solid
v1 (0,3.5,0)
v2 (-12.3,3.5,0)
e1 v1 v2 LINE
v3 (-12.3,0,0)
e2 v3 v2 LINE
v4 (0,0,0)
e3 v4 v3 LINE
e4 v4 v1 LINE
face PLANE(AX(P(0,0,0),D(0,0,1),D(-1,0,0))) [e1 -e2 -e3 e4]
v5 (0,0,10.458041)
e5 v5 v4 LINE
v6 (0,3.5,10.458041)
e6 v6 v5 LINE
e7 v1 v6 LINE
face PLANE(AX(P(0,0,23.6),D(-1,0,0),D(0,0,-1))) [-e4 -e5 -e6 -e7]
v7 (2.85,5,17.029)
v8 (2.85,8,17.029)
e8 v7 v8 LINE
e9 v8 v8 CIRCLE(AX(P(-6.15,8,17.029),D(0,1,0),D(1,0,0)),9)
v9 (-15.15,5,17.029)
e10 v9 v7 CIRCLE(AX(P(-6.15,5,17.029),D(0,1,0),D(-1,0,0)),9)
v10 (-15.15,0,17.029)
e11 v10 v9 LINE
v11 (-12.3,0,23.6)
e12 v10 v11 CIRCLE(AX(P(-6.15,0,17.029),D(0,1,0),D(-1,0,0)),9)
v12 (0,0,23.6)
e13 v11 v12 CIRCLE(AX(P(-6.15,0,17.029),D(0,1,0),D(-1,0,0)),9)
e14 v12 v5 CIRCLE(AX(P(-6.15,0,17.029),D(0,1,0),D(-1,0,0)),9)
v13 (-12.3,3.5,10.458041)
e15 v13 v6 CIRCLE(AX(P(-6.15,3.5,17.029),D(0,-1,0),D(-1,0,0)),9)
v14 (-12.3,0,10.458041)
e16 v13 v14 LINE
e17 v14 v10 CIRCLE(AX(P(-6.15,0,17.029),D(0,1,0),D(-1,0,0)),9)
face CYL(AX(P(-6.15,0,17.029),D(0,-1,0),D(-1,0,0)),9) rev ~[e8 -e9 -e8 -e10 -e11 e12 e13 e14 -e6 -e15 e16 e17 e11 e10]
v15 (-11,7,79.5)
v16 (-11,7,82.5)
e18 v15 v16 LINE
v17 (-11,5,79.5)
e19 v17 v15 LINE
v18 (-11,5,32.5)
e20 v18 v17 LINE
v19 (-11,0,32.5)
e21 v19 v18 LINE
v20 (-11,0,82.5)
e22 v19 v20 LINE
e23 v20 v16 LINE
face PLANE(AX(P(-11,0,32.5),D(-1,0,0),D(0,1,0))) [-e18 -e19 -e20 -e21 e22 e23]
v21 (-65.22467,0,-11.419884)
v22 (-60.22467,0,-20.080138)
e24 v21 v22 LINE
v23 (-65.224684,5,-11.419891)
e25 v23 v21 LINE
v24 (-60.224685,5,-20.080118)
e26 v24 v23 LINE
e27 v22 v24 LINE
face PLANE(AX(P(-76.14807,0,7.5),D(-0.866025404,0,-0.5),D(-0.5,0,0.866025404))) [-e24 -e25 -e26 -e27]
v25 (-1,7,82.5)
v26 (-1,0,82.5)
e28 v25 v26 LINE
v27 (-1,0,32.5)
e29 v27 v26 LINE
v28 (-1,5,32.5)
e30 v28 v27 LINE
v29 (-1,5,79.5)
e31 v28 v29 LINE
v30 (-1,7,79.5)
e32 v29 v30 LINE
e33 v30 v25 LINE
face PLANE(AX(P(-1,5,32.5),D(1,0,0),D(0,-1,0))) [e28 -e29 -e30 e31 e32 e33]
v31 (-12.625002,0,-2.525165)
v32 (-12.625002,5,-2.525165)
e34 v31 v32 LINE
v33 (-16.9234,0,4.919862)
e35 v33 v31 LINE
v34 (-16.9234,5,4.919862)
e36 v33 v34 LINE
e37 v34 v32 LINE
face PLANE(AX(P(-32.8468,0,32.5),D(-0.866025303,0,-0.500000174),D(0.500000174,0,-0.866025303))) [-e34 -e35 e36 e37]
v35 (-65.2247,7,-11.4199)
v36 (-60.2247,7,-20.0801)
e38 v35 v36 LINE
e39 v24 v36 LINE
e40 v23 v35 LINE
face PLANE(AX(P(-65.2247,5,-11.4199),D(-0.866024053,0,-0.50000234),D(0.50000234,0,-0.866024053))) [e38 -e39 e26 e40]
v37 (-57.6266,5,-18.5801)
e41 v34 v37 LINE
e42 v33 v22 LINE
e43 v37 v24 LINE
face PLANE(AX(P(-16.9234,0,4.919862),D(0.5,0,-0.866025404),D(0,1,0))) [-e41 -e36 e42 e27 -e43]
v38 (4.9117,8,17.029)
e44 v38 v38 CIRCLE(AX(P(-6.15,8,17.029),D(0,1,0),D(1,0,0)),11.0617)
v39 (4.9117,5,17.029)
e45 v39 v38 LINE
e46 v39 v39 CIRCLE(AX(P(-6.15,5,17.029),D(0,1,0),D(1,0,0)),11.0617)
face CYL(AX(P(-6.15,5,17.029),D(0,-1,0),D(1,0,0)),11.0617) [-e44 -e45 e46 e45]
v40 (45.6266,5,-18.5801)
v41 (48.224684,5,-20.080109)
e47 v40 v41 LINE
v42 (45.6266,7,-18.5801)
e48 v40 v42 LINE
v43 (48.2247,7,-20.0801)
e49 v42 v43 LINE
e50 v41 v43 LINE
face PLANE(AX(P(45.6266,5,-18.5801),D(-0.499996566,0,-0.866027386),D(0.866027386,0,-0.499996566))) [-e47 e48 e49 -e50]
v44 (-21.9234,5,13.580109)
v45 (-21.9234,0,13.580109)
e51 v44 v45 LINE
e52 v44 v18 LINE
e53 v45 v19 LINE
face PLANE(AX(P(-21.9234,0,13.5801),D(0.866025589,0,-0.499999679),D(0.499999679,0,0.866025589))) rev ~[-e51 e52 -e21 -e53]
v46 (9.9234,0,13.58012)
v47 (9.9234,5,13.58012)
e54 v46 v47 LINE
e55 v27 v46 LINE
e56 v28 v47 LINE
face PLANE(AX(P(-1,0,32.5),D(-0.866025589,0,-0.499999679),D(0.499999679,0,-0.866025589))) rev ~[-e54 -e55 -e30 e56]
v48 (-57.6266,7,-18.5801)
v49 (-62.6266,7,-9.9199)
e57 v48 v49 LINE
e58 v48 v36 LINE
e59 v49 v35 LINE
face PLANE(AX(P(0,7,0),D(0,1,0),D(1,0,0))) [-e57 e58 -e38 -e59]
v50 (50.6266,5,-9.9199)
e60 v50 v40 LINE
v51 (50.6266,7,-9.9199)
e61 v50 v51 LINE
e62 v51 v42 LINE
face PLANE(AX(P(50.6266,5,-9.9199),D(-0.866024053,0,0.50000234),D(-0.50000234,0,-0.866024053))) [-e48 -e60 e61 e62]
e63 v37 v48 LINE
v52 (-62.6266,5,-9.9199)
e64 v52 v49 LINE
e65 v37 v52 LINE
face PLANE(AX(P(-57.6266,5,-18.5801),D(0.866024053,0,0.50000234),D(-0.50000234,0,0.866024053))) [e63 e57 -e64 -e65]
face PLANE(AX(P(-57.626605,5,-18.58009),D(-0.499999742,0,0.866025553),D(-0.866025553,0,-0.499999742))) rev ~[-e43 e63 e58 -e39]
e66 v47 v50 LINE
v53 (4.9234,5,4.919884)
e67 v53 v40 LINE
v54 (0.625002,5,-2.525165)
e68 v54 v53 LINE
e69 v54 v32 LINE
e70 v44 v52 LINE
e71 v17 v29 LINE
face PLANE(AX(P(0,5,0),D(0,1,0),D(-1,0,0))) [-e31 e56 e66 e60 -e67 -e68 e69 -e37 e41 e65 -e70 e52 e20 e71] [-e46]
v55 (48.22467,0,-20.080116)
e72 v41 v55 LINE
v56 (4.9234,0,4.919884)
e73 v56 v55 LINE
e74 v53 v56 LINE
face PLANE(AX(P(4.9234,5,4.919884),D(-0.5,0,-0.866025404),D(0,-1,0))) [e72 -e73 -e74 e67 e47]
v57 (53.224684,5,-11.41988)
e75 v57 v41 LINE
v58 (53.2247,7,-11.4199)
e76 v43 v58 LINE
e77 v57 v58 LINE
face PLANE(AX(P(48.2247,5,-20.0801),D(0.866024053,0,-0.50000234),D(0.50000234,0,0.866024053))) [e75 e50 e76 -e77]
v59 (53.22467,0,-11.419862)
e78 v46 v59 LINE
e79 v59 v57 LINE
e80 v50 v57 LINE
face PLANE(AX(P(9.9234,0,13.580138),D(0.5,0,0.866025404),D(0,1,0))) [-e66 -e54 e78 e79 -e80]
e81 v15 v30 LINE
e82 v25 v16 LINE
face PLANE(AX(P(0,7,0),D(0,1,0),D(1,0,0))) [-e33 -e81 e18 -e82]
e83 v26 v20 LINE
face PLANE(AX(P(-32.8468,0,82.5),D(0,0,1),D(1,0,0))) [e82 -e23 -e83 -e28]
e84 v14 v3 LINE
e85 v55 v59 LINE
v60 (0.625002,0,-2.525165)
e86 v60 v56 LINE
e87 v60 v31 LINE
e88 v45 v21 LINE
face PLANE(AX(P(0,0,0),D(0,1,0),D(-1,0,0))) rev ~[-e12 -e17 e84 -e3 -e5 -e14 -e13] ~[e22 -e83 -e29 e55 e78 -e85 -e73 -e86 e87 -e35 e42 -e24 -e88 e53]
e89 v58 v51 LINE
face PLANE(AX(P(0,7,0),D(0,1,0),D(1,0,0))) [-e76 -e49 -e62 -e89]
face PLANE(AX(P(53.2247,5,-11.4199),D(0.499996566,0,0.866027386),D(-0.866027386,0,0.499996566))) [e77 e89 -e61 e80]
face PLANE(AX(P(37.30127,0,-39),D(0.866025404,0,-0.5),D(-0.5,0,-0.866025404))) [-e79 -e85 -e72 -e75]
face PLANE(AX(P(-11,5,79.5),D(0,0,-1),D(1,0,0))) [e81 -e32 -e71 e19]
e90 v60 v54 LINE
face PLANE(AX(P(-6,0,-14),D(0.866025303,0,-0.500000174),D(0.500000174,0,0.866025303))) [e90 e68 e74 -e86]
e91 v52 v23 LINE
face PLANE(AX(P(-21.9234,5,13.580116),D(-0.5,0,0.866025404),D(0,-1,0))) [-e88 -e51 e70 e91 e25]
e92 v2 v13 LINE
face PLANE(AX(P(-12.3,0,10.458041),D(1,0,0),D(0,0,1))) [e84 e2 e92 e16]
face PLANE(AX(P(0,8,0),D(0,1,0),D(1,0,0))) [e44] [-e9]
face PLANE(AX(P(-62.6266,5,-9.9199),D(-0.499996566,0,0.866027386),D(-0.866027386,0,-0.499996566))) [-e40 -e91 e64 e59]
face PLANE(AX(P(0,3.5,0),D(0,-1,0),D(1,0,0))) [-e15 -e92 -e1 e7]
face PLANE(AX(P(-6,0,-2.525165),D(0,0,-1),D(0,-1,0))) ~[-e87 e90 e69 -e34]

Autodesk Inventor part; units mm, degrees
ref_plane "YZ Plane" through (0, 0, 0) normal (1, 0, 0) x (0, 1, 0)
ref_plane "XZ Plane" through (0, 0, 0) normal (0, 1, 0) x (-1, 0, 0)
ref_plane "XY Plane" through (0, 0, 0) normal (0, 0, 1) x (1, 0, 0)
sketch "Boceto1" plane through (0, 0, 0) normal (0, 1, 0) x (-1, 0, 0)
  circle A0 centre (6.15, 17.029) radius 9
  dimension "d2" = 18
sketch "Boceto2" plane through (0, 0, 0) normal (0, 1, 0) x (-1, 0, 0)
  line L0 (6, -14) -> (-20.8468, 32.5)
  line L1 (-20.8468, 32.5) -> (32.8468, 32.5)
  line L2 (32.8468, 32.5) -> (6, -14)
  point P0 (0, 0)
  point P1 (6, 17)
extrude "Extrusión1" add sketch "Boceto2" along normal blind 5
extrude "Extrusión2" cut sketch "Boceto1" along normal blind 5
sketch "Boceto3" plane through (0, 0, 0) normal (0, -1, 0) x (1, 0, 0)
  circle A0 centre (-6.15, 17.029) radius 9 projected
  line L0 (-12.3, 23.6) -> (0, 23.6)
  line L1 (0, 23.6) -> (0, 0)
  line L2 (0, 0) -> (-12.3, 0)
  line L3 (-12.3, 0) -> (-12.3, 23.6)
  point P0 (0, 0)
  point P1 (-6.15, 23.6)
  dimension "d7" = 12.3
  dimension "d8" = 23.6
extrude "Extrusión3" cut sketch "Boceto3" against normal blind 3.5 contours L1 A0 L3 L0 | L1 L2 L3 A0
sketch "Boceto4" plane through (0, 5, 0) normal (0, 1, 0) x (1, 0, 0)
  circle A0 centre (-6.15, -17.029) radius 9 projected
  circle A1 centre (-6.15, -17.029) radius 11.0617
  point P0 (0, 0)
extrude "Extrusión4" add sketch "Boceto4" along normal blind 3
sketch "Boceto5" plane through (-32.8468, 0, 32.5) normal (0, 0, 1) x (1, 0, 0)
  line L0 (53.6936, 0) -> (0, 0) projected
  line L1 (0, 5) -> (53.6936, 5) projected
  line L2 (21.8468, 5) -> (31.8468, 5)
  line L3 (31.8468, 5) -> (31.8468, 0)
  line L4 (31.8468, 0) -> (21.8468, 0)
  line L5 (21.8468, 0) -> (21.8468, 5)
  point P0 (32.8468, 0)
  point P1 (26.8468, 0)
  point P2 (26.8468, 0)
  dimension "d13" = 10
extrude "Extrusión5" add sketch "Boceto5" along normal blind 50
sketch "Boceto6" plane through (-32.8468, 0, 32.5) normal (-0.8660254, 0, -0.5) x (-0.5, 0, 0.8660254)
  line L0 (-53.6936, 5) -> (0, 5) projected
  line L1 (-31.8468, 5) -> (-21.8468, 5)
  line L2 (-21.8468, 5) -> (-21.8468, 0)
  line L3 (-21.8468, 0) -> (-31.8468, 0)
  line L4 (-31.8468, 0) -> (-31.8468, 5)
  point P0 (-44.5692, 0)
  point P1 (-26.8468, 5)
  point P2 (-26.8468, 5)
  dimension "d16" = 10
  dimension "d17" = 5
extrude "Extrusión6" add sketch "Boceto6" along normal blind 50
sketch "Boceto7" plane through (-6, 0, -14) normal (0.8660254, 0, -0.5) x (-0.5, 0, -0.8660254)
  line L0 (0, 0) -> (-53.6936, 0) projected
  line L1 (-53.6936, 5) -> (0, 5) projected
  line L2 (-31.8468, 5) -> (-21.8468, 5)
  line L3 (-21.8468, 5) -> (-21.8468, 0)
  line L4 (-21.8468, 0) -> (-31.8468, 0)
  line L5 (-31.8468, 0) -> (-31.8468, 5)
  point P0 (-15.1244, 0)
  point P1 (-26.8468, 5)
  point P2 (-26.8468, 5)
  dimension "d20" = 10
extrude "Extrusión7" add sketch "Boceto7" along normal blind 50
chamfer "Chaflán1" distance 13.25 angle 45 1 edges at (-6, 2.5, -14)
sketch "Boceto8" plane through (0, 0, 0) normal (0, -1, 0) x (1, 0, 0)
  line L0 (9.9234, 13.5801) -> (20.8468, 32.5) projected
  line L1 (20.8468, 32.5) -> (-1, 32.5) projected
  line L2 (-11, 32.5) -> (-32.8468, 32.5) projected
  line L3 (-32.8468, 32.5) -> (-21.9234, 13.5801) projected
  line L4 (-16.9234, 4.9199) -> (-12.625, -2.5252) projected
  line L5 (-21.9234, 13.5801) -> (-11, 32.5)
  line L6 (-11, 32.5) -> (-31.0383, 44.0691)
  line L7 (-31.0383, 44.0691) -> (-41.9617, 25.1492)
  line L8 (-41.9617, 25.1492) -> (-21.9234, 13.5801)
  line L9 (-1, 32.5) -> (9.9234, 13.5801)
  line L10 (9.9234, 13.5801) -> (33.1734, 27.0035)
  line L11 (33.1734, 27.0035) -> (22.25, 45.9234)
  line L12 (22.25, 45.9234) -> (-1, 32.5)
extrude "Extrusión8" cut sketch "Boceto8" against normal blind 5 contours L9 L1 L0 | L5 L3 L2
sketch "Boceto9" plane through (0, 5, 0) normal (0, 1, 0) x (1, 0, 0)
  line L0 (48.2247, 20.0801) -> (53.2247, 11.4199) projected
  line L1 (-16.9234, -4.9199) -> (-60.2247, 20.0801) projected
  line L2 (-11, -32.5) -> (-11, -82.5) projected
  line L3 (-60.2247, 20.0801) -> (-57.6266, 18.5801)
  line L4 (-57.6266, 18.5801) -> (-62.6266, 9.9199)
  line L5 (-62.6266, 9.9199) -> (-65.2247, 11.4199)
  line L6 (-65.2247, 11.4199) -> (-60.2247, 20.0801)
  line L7 (48.2247, 20.0801) -> (53.2247, 11.4199)
  line L8 (53.2247, 11.4199) -> (50.6266, 9.9199)
  line L9 (50.6266, 9.9199) -> (45.6266, 18.5801)
  line L10 (45.6266, 18.5801) -> (48.2247, 20.0801)
  line L11 (-1, -82.5) -> (-11, -82.5)
  line L12 (-11, -82.5) -> (-11, -79.5)
  line L13 (-11, -79.5) -> (-1, -79.5)
  line L14 (-1, -79.5) -> (-1, -82.5)
  point P0 (0, 0)
  dimension "d31" = 3
  dimension "d32" = 3
extrude "Extrusión9" add sketch "Boceto9" along normal blind 2
properties part number "BaseVentosa"
